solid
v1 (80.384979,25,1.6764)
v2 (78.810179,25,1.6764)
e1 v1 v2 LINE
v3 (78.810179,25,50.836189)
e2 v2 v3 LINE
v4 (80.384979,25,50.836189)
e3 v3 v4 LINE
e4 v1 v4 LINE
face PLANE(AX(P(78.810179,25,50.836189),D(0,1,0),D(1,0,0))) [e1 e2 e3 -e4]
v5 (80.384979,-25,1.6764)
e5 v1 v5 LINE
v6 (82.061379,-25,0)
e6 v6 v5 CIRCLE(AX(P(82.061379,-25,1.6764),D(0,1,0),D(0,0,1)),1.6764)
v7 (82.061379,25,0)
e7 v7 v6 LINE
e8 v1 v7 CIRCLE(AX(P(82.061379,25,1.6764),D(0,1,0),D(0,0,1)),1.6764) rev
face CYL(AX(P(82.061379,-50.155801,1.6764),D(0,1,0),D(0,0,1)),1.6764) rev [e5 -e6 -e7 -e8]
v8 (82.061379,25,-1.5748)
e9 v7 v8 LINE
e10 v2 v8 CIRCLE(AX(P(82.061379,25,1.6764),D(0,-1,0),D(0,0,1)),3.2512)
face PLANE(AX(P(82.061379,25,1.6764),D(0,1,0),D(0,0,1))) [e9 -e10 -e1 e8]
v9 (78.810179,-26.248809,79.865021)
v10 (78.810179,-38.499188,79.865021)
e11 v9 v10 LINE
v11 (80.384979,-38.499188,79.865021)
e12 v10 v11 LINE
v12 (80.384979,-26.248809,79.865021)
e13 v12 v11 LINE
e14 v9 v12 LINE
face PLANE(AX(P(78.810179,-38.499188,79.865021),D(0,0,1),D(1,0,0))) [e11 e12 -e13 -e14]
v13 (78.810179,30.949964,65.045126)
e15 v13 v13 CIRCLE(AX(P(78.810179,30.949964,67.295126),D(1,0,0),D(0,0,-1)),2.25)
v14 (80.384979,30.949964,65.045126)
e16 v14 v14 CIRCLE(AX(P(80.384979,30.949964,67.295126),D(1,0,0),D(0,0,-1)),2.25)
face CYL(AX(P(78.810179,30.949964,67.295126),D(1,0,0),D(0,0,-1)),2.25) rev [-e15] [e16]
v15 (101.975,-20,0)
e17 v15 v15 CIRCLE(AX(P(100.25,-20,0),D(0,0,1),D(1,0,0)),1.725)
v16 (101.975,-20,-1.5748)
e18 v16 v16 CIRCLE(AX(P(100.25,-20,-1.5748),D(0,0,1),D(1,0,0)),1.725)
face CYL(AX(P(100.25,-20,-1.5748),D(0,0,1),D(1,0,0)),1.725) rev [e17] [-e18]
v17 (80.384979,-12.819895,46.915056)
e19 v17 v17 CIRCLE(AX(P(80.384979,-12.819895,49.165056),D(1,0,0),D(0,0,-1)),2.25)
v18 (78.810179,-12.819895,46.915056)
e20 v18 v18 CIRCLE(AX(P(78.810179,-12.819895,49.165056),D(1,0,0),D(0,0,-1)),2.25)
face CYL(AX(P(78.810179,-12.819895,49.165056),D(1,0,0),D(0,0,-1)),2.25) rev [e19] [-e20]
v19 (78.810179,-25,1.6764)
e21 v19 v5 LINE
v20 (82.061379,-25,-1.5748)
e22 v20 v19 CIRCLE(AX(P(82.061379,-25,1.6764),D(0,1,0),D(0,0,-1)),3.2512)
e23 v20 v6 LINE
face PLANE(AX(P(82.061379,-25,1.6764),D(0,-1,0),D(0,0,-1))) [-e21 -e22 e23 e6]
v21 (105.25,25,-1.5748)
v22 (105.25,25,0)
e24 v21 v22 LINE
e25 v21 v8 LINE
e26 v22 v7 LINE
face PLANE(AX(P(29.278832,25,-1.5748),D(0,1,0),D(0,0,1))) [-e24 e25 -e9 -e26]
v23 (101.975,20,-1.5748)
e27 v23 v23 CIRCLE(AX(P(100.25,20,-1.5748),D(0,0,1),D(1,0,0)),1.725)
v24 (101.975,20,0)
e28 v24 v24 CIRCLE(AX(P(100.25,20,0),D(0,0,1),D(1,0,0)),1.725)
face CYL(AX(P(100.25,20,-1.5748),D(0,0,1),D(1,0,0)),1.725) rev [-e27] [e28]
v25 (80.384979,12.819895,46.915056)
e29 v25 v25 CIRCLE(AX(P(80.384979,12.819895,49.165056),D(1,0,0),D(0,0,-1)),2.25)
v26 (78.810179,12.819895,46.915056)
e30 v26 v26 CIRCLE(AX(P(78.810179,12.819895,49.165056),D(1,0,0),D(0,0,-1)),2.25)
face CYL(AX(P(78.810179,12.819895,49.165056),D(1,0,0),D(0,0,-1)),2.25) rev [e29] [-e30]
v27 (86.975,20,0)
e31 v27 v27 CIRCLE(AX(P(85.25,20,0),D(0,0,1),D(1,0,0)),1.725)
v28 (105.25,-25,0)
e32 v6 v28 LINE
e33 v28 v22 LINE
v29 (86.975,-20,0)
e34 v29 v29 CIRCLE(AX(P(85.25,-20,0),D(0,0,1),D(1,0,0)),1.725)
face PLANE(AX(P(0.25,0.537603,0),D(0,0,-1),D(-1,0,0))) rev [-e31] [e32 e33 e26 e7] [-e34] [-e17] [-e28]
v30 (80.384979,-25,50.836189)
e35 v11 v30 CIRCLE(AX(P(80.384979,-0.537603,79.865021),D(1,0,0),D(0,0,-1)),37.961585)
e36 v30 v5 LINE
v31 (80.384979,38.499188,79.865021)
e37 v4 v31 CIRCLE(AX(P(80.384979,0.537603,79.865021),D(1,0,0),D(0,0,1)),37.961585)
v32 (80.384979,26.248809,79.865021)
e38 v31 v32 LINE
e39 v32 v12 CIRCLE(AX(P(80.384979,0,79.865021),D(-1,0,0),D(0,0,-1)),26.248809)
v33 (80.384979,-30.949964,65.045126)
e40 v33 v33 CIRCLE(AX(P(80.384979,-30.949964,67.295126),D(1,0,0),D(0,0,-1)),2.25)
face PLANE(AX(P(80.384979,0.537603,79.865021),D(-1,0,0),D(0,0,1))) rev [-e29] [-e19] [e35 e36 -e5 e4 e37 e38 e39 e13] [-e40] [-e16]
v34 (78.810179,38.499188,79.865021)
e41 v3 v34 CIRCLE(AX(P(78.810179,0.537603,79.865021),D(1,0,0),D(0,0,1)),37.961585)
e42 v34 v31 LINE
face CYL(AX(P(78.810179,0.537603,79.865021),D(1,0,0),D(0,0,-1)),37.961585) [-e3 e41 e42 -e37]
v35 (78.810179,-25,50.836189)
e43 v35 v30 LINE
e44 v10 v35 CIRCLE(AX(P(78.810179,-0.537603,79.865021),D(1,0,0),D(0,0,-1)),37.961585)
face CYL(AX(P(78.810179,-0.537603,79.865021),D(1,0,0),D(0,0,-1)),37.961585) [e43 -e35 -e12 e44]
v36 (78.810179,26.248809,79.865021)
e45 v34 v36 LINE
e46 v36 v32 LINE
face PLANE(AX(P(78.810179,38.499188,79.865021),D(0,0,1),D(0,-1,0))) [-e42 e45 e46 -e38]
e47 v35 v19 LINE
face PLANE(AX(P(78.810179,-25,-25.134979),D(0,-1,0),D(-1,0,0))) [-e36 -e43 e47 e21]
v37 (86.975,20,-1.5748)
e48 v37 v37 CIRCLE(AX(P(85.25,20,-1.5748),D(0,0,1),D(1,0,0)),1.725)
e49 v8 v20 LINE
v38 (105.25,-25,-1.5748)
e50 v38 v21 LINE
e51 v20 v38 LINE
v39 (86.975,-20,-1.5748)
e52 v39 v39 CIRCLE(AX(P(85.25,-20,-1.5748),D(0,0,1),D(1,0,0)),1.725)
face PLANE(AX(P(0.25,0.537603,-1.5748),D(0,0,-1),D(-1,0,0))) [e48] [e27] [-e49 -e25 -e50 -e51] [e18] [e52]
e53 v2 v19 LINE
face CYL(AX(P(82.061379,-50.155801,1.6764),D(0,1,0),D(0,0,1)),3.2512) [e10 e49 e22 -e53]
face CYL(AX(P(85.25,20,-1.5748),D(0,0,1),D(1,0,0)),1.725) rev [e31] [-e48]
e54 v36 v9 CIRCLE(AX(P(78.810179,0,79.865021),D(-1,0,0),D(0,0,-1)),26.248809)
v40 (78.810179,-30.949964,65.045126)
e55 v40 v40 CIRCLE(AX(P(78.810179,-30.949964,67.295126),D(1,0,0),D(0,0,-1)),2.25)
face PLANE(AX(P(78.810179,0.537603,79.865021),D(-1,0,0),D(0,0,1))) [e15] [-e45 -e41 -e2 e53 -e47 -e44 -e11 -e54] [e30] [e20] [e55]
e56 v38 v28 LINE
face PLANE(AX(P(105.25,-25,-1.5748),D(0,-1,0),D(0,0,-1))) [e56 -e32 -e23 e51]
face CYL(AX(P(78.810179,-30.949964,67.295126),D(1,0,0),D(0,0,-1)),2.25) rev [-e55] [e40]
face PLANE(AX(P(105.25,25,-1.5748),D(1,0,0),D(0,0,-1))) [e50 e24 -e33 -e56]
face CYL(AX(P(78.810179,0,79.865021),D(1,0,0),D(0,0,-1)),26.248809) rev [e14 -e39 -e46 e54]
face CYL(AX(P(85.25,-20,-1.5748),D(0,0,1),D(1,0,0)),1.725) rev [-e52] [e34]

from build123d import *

# Parameters (mm, degrees)
SKETCH1_R                  = 2.25
SKETCH1_R_2                = 1.725
BASE_FLANGE1_DEPTH         = 1.5748
SKETCHED_START             = 0.25
SKETCHED_BEND1_OUTLINE_W   = 50
SKETCHED_BEND1_OUTLINE_H   = 1.5748
SKETCHED_BEND1_DEPTH       = 78.867027748
SKETCHED_START_2           = 78.810179492
SKETCHED_BEND1_2_OUTLINE_R = 2.25
SKETCHED_BEND1_2_DEPTH     = 3.2512
SKETCHED_START_3           = -39
SKETCHED_BEND1_3_DEPTH     = 78


with BuildPart() as part:
    # Base-Flange1: sheet metal written as solids
    # Sketch1 → Base-Flange1 (new body)
    with BuildSketch(Plane.XY):
        with BuildLine():
            Line((0.25, 38.499188303), (0.25, 26.248809497))
            ThreePointArc((0.25, 26.248809497), (26.498809497, 0), (0.25, -26.248809497))
            Line((0.25, -26.248809497), (0.25, -38.499188303))
            ThreePointArc((0.25, -38.499188303), (16.257038834, -34.95934997), (29.278831944, -25))
            Line((29.278831944, -25), (80.25, -25))
            Line((80.25, -25), (105.25, -25))
            Line((105.25, -25), (105.25, 25))
            Line((105.25, 25), (80.25, 25))
            Line((80.25, 25), (29.278831944, 25))
            ThreePointArc((29.278831944, 25), (16.257038834, 34.95934997), (0.25, 38.499188303))
        make_face()
        with Locations((12.819894984, 30.949964339)):
            Circle(SKETCH1_R, mode=Mode.SUBTRACT)
        with Locations((30.949964339, 12.819894984)):
            Circle(SKETCH1_R, mode=Mode.SUBTRACT)
        with Locations((30.949964339, -12.819894984)):
            Circle(SKETCH1_R, mode=Mode.SUBTRACT)
        with Locations((12.819894984, -30.949964339)):
            Circle(SKETCH1_R, mode=Mode.SUBTRACT)
        with Locations((100.25, 20)):
            Circle(SKETCH1_R_2, mode=Mode.SUBTRACT)
        with Locations((85.25, 20)):
            Circle(SKETCH1_R_2, mode=Mode.SUBTRACT)
        with Locations((85.25, -20)):
            Circle(SKETCH1_R_2, mode=Mode.SUBTRACT)
        with Locations((100.25, -20)):
            Circle(SKETCH1_R_2, mode=Mode.SUBTRACT)
    extrude(amount=-BASE_FLANGE1_DEPTH)

    # Sketched Bend1: read off the stored shape, not the designer's step
    # Sketched Bend1 outline → Sketched Bend1 (cut)
    with BuildSketch(Plane.YZ.offset(SKETCHED_START)):
        with Locations((0, -0.7874)):
            Rectangle(SKETCHED_BEND1_OUTLINE_W, SKETCHED_BEND1_OUTLINE_H)
    extrude(amount=SKETCHED_BEND1_DEPTH, mode=Mode.SUBTRACT)

    # Sketched Bend1 2 outline → Sketched Bend1 2 (add)
    with BuildSketch(Plane.YZ.offset(SKETCHED_START_2)):
        with BuildLine():
            Line((25, 0), (25, 50.836188564))
            ThreePointArc((25, 50.836188564), (34.95934997, 63.857981674), (38.499188303, 79.865020508))
            Line((38.499188303, 79.865020508), (26.248809497, 79.865020508))
            ThreePointArc((26.248809497, 79.865020508), (0, 53.616211011), (-26.248809497, 79.865020508))
            Line((-26.248809497, 79.865020508), (-38.499188303, 79.865020508))
            ThreePointArc((-38.499188303, 79.865020508), (-34.95934997, 63.857981674), (-25, 50.836188564))
            Line((-25, 50.836188564), (-25, 0))
            Line((-25, 0), (25, 0))
        make_face()
        with Locations((-12.819894984, 49.165056169)):
            Circle(SKETCHED_BEND1_2_OUTLINE_R, mode=Mode.SUBTRACT)
        with Locations((-30.949964339, 67.295125524)):
            Circle(SKETCHED_BEND1_2_OUTLINE_R, mode=Mode.SUBTRACT)
        with Locations((12.819894984, 49.165056169)):
            Circle(SKETCHED_BEND1_2_OUTLINE_R, mode=Mode.SUBTRACT)
        with Locations((30.949964339, 67.295125524)):
            Circle(SKETCHED_BEND1_2_OUTLINE_R, mode=Mode.SUBTRACT)
    extrude(amount=SKETCHED_BEND1_2_DEPTH)

    # Sketched Bend1 3 outline → Sketched Bend1 3 (cut)
    with BuildSketch(Plane(origin=(0, 0, 0), x_dir=(1, 0, 0), z_dir=(0, 1, 0)).offset(SKETCHED_START_3)):
        with BuildLine():
            ThreePointArc((82.061379492, 0), (80.875985684, -0.491006192), (80.384979492, -1.6764))
            Line((80.384979492, -1.6764), (80.384979492, -79.865020508))
            Line((80.384979492, -79.865020508), (82.061379492, -79.865020508))
            Line((82.061379492, -79.865020508), (82.061379492, 0))
        make_face()
        with BuildLine():
            Line((78.810179493, -81), (78.810179492, -1.6764))
            ThreePointArc((78.810179492, -1.6764), (79.762433925, 0.622545567), (82.061379492, 1.5748))
            Line((82.061379492, 1.5748), (84, 1.5748))
            Line((84, 1.5748), (84, 3))
            Line((84, 3), (-1, 3))
            Line((-1, 3), (-1, -81))
            Line((-1, -81), (78.810179493, -81))
        make_face()
    extrude(amount=SKETCHED_BEND1_3_DEPTH, mode=Mode.SUBTRACT)


solid = part.part
